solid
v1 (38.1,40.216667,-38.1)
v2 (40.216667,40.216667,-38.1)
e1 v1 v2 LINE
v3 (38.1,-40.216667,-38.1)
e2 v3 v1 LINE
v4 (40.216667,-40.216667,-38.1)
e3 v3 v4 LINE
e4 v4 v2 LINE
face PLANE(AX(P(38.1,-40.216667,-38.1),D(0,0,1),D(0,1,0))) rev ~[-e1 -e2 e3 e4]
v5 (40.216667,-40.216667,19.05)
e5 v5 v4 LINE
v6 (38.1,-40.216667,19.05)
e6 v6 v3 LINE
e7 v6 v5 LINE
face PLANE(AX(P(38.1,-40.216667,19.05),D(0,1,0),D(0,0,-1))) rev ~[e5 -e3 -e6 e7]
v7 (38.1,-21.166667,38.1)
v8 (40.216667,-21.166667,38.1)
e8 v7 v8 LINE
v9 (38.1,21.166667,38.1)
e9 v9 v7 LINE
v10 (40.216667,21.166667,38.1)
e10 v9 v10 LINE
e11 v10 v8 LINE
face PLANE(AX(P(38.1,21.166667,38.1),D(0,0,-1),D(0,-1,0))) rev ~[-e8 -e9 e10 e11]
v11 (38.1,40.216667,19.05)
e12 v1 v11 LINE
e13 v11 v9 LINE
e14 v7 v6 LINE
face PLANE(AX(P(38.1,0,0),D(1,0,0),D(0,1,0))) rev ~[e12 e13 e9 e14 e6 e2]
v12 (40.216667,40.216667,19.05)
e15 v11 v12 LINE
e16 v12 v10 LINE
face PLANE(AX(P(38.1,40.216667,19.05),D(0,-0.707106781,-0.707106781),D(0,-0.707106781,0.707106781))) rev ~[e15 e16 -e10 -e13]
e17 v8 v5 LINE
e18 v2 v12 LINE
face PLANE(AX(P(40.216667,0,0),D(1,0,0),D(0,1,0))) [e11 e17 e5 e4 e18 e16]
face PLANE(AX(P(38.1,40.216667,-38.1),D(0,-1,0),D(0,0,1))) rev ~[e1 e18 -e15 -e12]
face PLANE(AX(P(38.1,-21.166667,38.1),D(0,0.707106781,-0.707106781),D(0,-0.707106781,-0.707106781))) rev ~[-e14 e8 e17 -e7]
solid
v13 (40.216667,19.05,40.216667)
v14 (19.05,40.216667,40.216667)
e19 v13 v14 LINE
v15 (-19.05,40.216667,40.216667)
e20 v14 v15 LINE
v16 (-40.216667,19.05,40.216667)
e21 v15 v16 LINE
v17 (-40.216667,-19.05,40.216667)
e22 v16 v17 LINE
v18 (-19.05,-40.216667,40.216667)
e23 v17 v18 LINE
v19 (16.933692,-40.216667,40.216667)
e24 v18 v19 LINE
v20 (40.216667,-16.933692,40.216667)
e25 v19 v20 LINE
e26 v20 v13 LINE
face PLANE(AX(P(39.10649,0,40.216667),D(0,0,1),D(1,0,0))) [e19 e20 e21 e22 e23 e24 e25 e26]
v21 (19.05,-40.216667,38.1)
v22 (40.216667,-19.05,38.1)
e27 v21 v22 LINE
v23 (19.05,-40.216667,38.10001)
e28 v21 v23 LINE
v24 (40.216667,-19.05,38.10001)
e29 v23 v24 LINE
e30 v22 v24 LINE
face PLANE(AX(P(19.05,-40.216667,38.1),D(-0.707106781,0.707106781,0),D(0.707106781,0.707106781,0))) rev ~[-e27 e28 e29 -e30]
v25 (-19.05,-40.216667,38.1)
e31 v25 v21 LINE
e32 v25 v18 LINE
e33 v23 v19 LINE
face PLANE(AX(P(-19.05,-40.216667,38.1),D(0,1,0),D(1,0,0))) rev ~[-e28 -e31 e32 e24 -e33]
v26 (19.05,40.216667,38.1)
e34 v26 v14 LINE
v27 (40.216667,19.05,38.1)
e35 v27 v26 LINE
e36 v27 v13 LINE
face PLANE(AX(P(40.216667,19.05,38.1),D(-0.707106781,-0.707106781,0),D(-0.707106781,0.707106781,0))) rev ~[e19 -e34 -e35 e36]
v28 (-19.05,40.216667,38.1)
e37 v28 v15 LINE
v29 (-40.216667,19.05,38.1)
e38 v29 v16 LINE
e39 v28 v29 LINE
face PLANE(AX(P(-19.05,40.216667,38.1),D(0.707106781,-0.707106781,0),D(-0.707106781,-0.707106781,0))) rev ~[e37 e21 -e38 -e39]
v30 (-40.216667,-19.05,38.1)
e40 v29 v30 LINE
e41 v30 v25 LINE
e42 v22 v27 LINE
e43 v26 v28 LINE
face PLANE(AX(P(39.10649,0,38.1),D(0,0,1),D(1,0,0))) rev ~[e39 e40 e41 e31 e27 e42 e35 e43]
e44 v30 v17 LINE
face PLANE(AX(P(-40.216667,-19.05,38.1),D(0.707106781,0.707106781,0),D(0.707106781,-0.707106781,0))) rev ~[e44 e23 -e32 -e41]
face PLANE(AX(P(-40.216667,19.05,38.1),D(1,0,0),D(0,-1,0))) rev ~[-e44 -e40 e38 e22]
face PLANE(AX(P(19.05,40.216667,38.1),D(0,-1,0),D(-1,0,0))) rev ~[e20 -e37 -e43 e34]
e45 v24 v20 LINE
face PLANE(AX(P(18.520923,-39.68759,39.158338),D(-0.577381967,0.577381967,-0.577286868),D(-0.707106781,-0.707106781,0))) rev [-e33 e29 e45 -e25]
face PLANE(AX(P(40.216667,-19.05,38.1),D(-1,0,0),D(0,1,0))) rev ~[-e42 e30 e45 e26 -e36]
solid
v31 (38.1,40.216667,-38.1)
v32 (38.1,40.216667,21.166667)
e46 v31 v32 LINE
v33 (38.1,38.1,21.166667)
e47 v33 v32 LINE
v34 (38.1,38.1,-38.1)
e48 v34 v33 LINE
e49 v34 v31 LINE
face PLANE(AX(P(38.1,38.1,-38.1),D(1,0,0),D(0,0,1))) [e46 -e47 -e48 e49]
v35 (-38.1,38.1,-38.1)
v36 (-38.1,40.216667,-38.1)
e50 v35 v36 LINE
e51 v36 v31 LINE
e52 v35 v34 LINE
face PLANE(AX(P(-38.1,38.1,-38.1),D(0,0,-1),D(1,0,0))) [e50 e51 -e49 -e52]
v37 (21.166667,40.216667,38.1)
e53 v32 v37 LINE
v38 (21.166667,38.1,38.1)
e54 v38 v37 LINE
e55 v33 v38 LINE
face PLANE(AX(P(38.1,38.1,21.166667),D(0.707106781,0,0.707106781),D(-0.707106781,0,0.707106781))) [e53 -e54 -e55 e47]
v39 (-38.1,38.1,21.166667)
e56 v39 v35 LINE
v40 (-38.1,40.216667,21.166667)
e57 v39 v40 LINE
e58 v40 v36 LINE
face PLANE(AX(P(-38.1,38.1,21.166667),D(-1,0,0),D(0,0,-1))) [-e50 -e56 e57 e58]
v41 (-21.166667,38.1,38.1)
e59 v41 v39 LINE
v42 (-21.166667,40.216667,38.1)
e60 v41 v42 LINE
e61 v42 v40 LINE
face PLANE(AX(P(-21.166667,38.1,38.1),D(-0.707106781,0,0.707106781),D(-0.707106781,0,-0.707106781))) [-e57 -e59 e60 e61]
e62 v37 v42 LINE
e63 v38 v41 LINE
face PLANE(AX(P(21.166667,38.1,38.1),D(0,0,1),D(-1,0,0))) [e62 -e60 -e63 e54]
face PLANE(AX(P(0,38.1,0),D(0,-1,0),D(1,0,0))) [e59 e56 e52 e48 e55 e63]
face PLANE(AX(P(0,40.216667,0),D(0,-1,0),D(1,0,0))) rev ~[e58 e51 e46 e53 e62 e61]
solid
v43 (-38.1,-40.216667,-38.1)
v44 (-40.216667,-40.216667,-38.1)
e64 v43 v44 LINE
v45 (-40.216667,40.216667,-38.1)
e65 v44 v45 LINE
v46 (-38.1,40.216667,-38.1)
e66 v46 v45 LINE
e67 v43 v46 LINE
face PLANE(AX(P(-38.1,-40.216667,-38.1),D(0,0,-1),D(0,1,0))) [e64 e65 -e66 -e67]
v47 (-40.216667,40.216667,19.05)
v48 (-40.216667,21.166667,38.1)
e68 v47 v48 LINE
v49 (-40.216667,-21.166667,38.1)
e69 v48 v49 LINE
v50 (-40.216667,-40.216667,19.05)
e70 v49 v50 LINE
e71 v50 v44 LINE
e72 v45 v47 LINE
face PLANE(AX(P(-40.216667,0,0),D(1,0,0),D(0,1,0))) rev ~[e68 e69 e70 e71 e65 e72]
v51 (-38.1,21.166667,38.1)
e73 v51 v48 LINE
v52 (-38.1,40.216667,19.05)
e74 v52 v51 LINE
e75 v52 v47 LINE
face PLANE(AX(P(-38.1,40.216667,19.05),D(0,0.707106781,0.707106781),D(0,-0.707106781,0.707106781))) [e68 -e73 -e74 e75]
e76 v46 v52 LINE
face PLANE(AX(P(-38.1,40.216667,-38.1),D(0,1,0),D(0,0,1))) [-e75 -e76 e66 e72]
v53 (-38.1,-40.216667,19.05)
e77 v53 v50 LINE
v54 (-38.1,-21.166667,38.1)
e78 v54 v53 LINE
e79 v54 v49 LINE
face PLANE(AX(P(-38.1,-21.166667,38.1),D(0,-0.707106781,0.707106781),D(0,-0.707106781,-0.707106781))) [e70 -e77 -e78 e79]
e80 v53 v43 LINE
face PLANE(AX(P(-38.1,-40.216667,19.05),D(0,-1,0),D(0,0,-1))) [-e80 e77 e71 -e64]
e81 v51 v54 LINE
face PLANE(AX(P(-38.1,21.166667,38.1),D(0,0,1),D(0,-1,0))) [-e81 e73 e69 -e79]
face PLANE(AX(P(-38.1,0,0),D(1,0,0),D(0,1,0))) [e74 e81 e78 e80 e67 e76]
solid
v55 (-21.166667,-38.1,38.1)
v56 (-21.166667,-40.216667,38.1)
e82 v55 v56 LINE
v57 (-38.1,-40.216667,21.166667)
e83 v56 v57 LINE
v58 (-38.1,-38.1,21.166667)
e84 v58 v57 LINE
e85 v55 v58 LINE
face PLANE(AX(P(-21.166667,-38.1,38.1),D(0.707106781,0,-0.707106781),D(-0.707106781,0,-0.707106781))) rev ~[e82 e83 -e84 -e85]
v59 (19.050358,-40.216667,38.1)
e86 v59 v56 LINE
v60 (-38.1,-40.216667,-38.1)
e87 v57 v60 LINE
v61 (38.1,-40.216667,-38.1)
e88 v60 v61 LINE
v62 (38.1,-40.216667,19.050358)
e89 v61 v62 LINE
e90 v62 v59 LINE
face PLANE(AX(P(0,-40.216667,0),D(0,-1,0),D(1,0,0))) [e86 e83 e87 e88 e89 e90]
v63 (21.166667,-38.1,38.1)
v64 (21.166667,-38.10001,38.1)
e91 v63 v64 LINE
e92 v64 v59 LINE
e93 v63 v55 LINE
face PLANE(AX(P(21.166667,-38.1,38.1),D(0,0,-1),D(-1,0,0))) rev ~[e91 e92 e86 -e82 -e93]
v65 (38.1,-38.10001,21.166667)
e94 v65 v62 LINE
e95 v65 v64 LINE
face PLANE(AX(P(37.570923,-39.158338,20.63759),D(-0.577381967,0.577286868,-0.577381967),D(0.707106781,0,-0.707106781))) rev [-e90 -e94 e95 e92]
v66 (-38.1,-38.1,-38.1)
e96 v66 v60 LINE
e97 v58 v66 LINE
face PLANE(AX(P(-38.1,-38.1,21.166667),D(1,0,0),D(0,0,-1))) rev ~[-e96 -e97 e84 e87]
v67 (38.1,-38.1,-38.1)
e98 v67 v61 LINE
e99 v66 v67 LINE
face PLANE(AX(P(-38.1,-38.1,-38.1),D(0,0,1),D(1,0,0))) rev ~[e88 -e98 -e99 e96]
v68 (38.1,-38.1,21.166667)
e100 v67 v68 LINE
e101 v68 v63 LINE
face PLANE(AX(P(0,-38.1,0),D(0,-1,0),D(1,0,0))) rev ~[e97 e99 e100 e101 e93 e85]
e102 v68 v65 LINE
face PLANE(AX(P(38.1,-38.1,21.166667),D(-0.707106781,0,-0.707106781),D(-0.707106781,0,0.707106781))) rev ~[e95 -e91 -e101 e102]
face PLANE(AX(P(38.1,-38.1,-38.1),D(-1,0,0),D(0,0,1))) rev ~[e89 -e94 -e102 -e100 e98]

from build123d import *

# Parameters (mm, degrees)
F3_START   = 38.1
F3_DEPTH   = 2.1166666667
F4_START   = -38.1
F4_DEPTH   = 2.1166666667
F5_START   = 38.1
F5_DEPTH   = 2.1166666667
F6_START   = -38.1
F6_DEPTH   = 2.1166666667
F7_START   = 38.1
F7_DEPTH   = 2.1166666667
F9_SIZE2   = 1.496456
F9_SIZE    = 2.116657
F9_2_SIZE2 = 1.496456
F9_2_SIZE  = 2.116657


# Not quite as in the source:
# - a fillet or chamfer is up to 0.001 mm smaller than in the source, because OpenCascade refuses the exact size


with BuildPart() as f3:
    # F0 (on Front) → F3 (new body)
    with BuildSketch(Plane.XZ.offset(F3_START)):
        Polygon((38.1, 21.1666666667), (21.1666666667, 38.1), (-21.1666666667, 38.1), (-38.1, 21.1666666667), (-38.1, -21.1666666667), (-21.1666666667, -38.1), (21.1666666667, -38.1), (38.1, -21.1666666667), align=None)
        Polygon((-21.1666666667, -38.1), (-38.1, -21.1666666667), (-38.1, -38.1), align=None)
        Polygon((38.1, -38.1), (38.1, -21.1666666667), (21.1666666667, -38.1), align=None)
    extrude(amount=F3_DEPTH)

    # F9#2 (size 2.1166666667 and 1.4964661159 in the source; OpenCascade refuses exactly that, so slightly less here)
    f9_2_edges = [f3.edges().sort_by_distance(p)[0] for p in [
        (29.633333, -40.216667, 29.633333),
    ]]
    f9_2_side = f3.faces().sort_by_distance((29.633333, -39.158333, 29.633333))[0]
    chamfer(f9_2_edges, length=F9_2_SIZE, length2=F9_2_SIZE2, reference=f9_2_side)


with BuildPart() as f4:
    # F0 (on Front) → F4 (new body)
    with BuildSketch(Plane.XZ.offset(F4_START)):
        Polygon((38.1, 21.1666666667), (21.1666666667, 38.1), (-21.1666666667, 38.1), (-38.1, 21.1666666667), (-38.1, -21.1666666667), (-21.1666666667, -38.1), (21.1666666667, -38.1), (38.1, -21.1666666667), align=None)
        Polygon((38.1, -38.1), (38.1, -21.1666666667), (21.1666666667, -38.1), align=None)
        Polygon((-21.1666666667, -38.1), (-38.1, -21.1666666667), (-38.1, -38.1), align=None)
    extrude(amount=-F4_DEPTH)


with BuildPart() as f5:
    # F1 (on Right) → F5 (new body)
    with BuildSketch(Plane.YZ.offset(F5_START)):
        Polygon((21.1666666667, 38.1), (-21.1666666667, 38.1), (-40.2166666667, 19.05), (-40.2166666667, -19.05), (-21.1666666667, -38.1), (21.1666666667, -38.1), (40.2166666667, -19.05), (40.2166666667, 19.05), align=None)
        Polygon((-21.1666666667, -38.1), (-40.2166666667, -19.05), (-40.2166666667, -38.1), align=None)
        Polygon((40.2166666667, -38.1), (40.2166666667, -19.05), (21.1666666667, -38.1), align=None)
    extrude(amount=F5_DEPTH)


with BuildPart() as f6:
    # F1 (on Right) → F6 (new body)
    with BuildSketch(Plane.YZ.offset(F6_START)):
        Polygon((21.1666666667, 38.1), (-21.1666666667, 38.1), (-40.2166666667, 19.05), (-40.2166666667, -19.05), (-21.1666666667, -38.1), (21.1666666667, -38.1), (40.2166666667, -19.05), (40.2166666667, 19.05), align=None)
        Polygon((40.2166666667, -38.1), (40.2166666667, -19.05), (21.1666666667, -38.1), align=None)
        Polygon((-21.1666666667, -38.1), (-40.2166666667, -19.05), (-40.2166666667, -38.1), align=None)
    extrude(amount=-F6_DEPTH)


with BuildPart() as f7:
    # F2 (on Top) → F7 (new body)
    with BuildSketch(Plane.XY.offset(F7_START)):
        Polygon((40.2166666667, 19.05), (38.1, 21.1666666667), (38.1, -21.1666666667), (40.2166666667, -19.05), align=None)
        Polygon((-21.1666666667, 38.1), (21.1666666667, 38.1), (19.05, 40.2166666667), (-19.05, 40.2166666667), align=None)
        Polygon((38.1, 21.1666666667), (21.1666666667, 38.1), (-21.1666666667, 38.1), (-38.1, 21.1666666667), (-38.1, -21.1666666667), (-21.1666666667, -38.1), (21.1666666667, -38.1), (38.1, -21.1666666667), align=None)
        Polygon((19.05, -40.2166666667), (21.1666666667, -38.1), (-21.1666666667, -38.1), (-19.05, -40.2166666667), align=None)
        Polygon((-38.1, -21.1666666667), (-38.1, 21.1666666667), (-40.2166666667, 19.05), (-40.2166666667, -19.05), align=None)
    extrude(amount=F7_DEPTH)

    # F9 (size 2.1166666667 and 1.4964661159 in the source; OpenCascade refuses exactly that, so slightly less here)
    f9_edges = [f7.edges().sort_by_distance(p)[0] for p in [
        (29.633333, -29.633333, 40.216667),
    ]]
    f9_side = f7.faces().sort_by_distance((29.633333, -29.633333, 39.158333))[0]
    chamfer(f9_edges, length=F9_SIZE, length2=F9_SIZE2, reference=f9_side)


solid = Compound([f3.part, f4.part, f5.part, f6.part, f7.part])
